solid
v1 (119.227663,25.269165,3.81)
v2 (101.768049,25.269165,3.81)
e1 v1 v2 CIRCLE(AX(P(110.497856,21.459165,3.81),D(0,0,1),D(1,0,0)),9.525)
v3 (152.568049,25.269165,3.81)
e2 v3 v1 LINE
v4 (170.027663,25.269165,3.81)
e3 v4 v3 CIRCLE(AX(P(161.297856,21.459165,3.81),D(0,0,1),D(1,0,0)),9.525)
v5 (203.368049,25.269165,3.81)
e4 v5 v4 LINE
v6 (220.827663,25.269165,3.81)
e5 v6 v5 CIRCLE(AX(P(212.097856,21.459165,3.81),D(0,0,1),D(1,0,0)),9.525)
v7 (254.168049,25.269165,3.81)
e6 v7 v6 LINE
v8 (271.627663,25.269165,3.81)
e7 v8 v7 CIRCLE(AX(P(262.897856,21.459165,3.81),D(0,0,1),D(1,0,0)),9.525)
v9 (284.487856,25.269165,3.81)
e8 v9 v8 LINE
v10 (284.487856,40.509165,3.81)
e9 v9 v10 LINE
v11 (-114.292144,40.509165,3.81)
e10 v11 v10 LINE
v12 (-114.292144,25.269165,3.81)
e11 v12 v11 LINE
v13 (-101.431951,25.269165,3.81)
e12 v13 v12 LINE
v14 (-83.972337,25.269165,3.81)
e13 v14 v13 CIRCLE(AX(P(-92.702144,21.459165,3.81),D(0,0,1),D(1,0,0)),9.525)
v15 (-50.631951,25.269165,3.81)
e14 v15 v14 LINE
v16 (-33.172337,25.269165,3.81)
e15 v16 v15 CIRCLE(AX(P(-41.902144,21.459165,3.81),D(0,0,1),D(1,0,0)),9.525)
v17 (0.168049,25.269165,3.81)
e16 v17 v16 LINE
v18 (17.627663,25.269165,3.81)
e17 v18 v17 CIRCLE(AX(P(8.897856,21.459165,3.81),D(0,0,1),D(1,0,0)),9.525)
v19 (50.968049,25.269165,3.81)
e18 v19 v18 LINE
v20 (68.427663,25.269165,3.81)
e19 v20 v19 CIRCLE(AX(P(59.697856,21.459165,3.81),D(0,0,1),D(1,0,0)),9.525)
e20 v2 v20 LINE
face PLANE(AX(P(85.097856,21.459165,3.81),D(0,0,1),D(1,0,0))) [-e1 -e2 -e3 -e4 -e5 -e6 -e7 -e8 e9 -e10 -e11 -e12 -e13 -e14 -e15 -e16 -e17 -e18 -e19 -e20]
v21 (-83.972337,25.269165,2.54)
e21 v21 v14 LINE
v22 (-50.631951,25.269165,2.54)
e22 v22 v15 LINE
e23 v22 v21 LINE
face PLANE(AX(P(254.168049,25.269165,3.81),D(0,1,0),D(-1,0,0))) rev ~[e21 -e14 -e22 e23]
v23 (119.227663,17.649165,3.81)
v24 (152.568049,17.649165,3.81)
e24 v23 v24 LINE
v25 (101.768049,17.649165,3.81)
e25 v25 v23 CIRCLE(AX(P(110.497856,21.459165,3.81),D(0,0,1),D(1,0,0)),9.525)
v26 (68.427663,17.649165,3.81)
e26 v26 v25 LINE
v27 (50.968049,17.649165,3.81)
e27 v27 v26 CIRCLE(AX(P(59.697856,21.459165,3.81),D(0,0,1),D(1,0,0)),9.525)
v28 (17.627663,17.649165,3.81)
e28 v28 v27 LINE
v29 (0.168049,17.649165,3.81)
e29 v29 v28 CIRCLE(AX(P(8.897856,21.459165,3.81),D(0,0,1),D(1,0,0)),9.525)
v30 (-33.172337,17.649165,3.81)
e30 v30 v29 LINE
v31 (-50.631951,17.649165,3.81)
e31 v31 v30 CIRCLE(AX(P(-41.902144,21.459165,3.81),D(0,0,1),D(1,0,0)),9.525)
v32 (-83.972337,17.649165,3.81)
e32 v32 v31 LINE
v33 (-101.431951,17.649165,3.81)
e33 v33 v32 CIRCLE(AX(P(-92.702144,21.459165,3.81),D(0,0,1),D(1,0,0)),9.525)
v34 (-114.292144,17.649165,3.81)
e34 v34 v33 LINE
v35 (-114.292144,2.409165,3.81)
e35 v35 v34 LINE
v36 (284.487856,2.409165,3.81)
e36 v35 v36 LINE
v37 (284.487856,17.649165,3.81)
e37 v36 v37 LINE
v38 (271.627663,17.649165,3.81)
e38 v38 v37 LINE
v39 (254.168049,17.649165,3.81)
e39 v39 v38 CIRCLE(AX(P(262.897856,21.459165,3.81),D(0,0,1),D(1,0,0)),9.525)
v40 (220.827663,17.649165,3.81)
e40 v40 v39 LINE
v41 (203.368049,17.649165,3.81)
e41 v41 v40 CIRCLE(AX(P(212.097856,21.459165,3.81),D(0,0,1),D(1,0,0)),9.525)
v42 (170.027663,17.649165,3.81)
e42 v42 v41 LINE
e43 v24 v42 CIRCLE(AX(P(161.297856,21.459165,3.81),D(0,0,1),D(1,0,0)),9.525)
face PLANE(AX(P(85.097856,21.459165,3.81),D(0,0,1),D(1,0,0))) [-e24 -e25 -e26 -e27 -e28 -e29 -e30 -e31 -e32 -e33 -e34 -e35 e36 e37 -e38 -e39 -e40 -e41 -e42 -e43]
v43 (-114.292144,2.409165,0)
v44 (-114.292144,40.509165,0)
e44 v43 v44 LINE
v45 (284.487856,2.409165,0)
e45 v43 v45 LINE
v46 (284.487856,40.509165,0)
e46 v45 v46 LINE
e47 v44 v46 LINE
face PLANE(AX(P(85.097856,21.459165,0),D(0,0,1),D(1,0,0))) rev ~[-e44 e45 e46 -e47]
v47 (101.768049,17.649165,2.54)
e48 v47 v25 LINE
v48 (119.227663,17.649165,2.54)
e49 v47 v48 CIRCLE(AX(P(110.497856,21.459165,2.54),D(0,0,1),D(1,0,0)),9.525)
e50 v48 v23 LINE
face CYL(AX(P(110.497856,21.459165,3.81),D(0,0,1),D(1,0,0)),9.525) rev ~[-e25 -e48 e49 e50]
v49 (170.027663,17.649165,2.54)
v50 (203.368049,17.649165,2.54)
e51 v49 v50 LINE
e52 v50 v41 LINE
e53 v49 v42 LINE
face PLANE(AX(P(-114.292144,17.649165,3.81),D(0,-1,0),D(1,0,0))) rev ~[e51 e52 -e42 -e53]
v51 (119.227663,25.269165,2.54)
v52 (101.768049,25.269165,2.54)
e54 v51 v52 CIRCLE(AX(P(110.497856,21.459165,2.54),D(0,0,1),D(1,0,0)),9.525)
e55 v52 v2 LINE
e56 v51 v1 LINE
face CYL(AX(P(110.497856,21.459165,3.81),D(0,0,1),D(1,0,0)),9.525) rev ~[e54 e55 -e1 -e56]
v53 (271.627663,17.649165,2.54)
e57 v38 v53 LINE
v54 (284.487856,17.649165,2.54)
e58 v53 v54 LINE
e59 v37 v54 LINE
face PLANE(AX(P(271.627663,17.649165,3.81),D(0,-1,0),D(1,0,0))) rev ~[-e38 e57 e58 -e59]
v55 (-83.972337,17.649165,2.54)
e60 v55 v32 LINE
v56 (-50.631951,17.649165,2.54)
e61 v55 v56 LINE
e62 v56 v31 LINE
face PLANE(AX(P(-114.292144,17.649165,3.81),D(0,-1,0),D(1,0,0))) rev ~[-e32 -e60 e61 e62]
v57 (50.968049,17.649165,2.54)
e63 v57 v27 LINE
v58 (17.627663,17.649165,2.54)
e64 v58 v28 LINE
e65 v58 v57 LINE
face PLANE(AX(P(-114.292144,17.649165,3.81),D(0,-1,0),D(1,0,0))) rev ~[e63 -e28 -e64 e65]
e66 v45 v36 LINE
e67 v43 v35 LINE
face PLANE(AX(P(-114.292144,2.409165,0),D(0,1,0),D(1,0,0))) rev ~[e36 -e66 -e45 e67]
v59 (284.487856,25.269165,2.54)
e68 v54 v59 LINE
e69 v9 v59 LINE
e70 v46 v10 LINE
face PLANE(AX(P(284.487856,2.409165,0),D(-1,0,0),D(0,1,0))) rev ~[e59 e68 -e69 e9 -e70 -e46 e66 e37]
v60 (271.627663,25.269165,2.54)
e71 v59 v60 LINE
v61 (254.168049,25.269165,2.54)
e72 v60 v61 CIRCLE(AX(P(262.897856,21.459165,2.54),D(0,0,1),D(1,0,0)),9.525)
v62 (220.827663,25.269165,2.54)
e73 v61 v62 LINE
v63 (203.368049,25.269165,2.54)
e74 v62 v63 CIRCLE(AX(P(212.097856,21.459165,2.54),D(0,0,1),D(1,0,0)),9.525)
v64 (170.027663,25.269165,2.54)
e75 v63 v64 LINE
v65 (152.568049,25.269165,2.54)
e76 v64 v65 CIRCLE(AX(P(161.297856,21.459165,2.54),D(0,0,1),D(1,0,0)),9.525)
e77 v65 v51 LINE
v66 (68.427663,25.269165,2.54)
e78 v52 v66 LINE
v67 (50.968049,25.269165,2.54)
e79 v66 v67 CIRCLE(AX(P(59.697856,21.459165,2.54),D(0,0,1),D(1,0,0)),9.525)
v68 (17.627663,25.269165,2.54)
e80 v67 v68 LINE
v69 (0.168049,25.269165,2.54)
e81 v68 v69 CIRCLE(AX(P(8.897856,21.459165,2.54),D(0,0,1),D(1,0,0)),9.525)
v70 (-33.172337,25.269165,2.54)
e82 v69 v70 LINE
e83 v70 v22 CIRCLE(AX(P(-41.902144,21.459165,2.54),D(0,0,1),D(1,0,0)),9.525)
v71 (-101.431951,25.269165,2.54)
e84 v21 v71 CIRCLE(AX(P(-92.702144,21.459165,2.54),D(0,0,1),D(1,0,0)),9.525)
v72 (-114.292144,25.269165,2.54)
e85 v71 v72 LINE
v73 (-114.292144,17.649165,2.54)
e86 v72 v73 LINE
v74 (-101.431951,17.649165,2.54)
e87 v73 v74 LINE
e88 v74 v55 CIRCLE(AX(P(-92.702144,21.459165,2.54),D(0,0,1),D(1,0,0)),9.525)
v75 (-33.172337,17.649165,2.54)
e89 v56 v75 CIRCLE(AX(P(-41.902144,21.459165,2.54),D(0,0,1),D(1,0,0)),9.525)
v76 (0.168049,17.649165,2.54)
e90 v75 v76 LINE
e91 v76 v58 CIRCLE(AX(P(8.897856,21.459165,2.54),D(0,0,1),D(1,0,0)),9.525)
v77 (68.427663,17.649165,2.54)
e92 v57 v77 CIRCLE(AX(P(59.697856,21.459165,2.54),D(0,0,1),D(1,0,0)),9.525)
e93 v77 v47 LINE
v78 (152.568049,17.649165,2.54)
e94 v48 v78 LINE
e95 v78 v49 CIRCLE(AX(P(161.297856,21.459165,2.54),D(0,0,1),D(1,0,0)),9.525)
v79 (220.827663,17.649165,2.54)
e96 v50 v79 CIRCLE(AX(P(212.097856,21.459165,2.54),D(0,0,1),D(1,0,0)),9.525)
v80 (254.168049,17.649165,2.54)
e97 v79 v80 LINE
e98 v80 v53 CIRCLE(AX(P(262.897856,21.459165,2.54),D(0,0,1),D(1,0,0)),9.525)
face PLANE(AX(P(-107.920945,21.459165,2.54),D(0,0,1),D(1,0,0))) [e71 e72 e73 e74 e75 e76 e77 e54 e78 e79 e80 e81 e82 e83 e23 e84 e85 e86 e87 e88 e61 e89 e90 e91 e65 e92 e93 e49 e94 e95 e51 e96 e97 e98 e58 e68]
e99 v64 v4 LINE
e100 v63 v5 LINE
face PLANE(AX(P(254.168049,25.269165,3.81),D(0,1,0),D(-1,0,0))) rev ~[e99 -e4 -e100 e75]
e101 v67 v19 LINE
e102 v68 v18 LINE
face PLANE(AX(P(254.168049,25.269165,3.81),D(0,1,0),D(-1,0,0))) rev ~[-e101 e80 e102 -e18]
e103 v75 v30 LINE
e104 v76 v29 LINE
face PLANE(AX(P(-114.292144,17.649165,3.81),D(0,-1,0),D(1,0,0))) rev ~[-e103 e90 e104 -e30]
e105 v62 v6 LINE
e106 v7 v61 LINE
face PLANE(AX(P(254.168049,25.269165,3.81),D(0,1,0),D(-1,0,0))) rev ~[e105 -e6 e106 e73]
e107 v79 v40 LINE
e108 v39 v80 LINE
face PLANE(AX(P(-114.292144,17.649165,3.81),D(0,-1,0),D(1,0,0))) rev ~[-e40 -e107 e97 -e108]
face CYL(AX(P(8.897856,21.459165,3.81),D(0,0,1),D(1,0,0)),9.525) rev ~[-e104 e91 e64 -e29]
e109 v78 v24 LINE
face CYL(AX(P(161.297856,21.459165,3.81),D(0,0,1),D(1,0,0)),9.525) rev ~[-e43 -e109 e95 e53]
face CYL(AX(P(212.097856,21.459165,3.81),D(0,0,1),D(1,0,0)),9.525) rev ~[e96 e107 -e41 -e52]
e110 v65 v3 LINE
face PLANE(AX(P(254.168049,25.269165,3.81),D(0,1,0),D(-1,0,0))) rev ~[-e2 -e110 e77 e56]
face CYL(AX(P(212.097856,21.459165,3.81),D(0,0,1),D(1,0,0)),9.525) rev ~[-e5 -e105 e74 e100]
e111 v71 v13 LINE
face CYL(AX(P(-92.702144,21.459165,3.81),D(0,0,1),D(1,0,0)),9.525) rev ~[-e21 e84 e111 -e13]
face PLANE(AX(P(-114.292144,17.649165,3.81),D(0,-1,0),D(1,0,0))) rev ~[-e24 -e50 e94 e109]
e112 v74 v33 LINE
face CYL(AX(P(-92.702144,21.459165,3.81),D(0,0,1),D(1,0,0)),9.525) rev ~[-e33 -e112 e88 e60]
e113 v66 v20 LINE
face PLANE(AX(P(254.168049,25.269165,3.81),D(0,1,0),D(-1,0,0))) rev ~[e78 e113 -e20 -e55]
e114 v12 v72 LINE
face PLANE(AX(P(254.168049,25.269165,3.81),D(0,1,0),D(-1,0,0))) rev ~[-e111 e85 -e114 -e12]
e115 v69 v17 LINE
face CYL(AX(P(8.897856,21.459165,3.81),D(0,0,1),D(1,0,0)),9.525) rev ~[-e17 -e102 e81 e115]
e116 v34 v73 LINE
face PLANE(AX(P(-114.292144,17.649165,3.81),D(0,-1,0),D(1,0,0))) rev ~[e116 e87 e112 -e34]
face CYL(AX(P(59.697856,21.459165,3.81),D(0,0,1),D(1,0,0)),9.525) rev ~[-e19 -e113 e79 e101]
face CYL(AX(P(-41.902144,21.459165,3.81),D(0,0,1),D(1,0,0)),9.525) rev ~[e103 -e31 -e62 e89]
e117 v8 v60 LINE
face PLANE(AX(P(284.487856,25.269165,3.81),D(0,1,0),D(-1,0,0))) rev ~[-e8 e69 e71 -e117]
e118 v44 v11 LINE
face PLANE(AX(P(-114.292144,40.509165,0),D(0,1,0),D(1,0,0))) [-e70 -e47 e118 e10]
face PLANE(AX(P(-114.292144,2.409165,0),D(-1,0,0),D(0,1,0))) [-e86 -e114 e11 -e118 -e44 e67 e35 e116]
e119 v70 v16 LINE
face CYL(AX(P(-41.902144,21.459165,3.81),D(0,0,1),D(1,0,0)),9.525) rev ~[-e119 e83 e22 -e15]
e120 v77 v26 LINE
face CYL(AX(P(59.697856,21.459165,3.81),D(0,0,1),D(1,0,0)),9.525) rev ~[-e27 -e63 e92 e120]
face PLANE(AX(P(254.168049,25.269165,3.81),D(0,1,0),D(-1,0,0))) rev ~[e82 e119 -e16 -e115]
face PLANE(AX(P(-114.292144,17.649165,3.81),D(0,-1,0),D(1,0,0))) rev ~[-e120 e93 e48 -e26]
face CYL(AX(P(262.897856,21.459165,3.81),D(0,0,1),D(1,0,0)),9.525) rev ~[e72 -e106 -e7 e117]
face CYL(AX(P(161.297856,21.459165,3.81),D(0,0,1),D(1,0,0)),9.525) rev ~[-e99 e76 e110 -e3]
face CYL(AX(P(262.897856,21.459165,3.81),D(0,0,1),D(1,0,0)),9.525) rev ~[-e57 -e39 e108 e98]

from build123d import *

# Parameters (mm, degrees)
F0_W     = 398.78
F0_H     = 38.1
F1_DEPTH = 3.81
F2_R     = 9.525
F3_DEPTH = 1.27
F5_DEPTH = 1.27


with BuildPart() as f1:
    # F0 (on Top) → F1 (new body)
    with BuildSketch(Plane.XY):
        with Locations((85.0978558012, 21.4591654949)):
            Rectangle(F0_W, F0_H)
    extrude(amount=F1_DEPTH)

    # F2 (on face) → F3 (cut)
    with BuildSketch(Plane.XY.offset(3.81)):
        with Locations((-92.7021441988, 21.4591654949)):
            Circle(F2_R)
        with Locations((-41.9021441988, 21.4591654949)):
            Circle(F2_R)
        with Locations((8.8978558012, 21.4591654949)):
            Circle(F2_R)
        with Locations((59.6978558012, 21.4591654949)):
            Circle(F2_R)
        with Locations((110.4978558012, 21.4591654949)):
            Circle(F2_R)
        with Locations((161.2978558012, 21.4591654949)):
            Circle(F2_R)
        with Locations((212.0978558012, 21.4591654949)):
            Circle(F2_R)
        with Locations((262.8978558012, 21.4591654949)):
            Circle(F2_R)
    extrude(amount=-F3_DEPTH, mode=Mode.SUBTRACT)

    # F4 (on face) → F5 (cut)
    with BuildSketch(Plane.XY.offset(3.81)):
        with BuildLine():
            Line((-101.4319508977, 25.2691654949), (-114.2921441988, 25.2691654949))
            Line((-114.2921441988, 25.2691654949), (-114.2921441988, 17.6491654949))
            Line((-114.2921441988, 17.6491654949), (-101.4319508977, 17.6491654949))
            ThreePointArc((-101.4319508977, 17.6491654949), (-102.2271441988, 21.4591654949), (-101.4319508977, 25.2691654949))
        make_face()
        with BuildLine():
            Line((-83.9723374999, 25.2691654949), (-101.4319508977, 25.2691654949))
            ThreePointArc((-101.4319508977, 25.2691654949), (-102.2271441988, 21.4591654949), (-101.4319508977, 17.6491654949))
            Line((-101.4319508977, 17.6491654949), (-83.9723374999, 17.6491654949))
            ThreePointArc((-83.9723374999, 17.6491654949), (-83.3780615681, 19.5131161387), (-83.1771441988, 21.4591654949))
            ThreePointArc((-83.1771441988, 21.4591654949), (-83.3780615681, 23.405214851), (-83.9723374999, 25.2691654949))
        make_face()
        with BuildLine():
            Line((-50.6319508977, 25.2691654949), (-83.9723374999, 25.2691654949))
            ThreePointArc((-83.9723374999, 25.2691654949), (-83.3780615681, 23.405214851), (-83.1771441988, 21.4591654949))
            ThreePointArc((-83.1771441988, 21.4591654949), (-83.3780615681, 19.5131161387), (-83.9723374999, 17.6491654949))
            Line((-83.9723374999, 17.6491654949), (-50.6319508977, 17.6491654949))
            ThreePointArc((-50.6319508977, 17.6491654949), (-51.4271441988, 21.4591654949), (-50.6319508977, 25.2691654949))
        make_face()
        with BuildLine():
            Line((-33.1723374999, 25.2691654949), (-50.6319508977, 25.2691654949))
            ThreePointArc((-50.6319508977, 25.2691654949), (-51.4271441988, 21.4591654949), (-50.6319508977, 17.6491654949))
            Line((-50.6319508977, 17.6491654949), (-33.1723374999, 17.6491654949))
            ThreePointArc((-33.1723374999, 17.6491654949), (-32.5780615681, 19.5131161387), (-32.3771441988, 21.4591654949))
            ThreePointArc((-32.3771441988, 21.4591654949), (-32.5780615681, 23.405214851), (-33.1723374999, 25.2691654949))
        make_face()
        with BuildLine():
            Line((284.4878558012, 17.6491654949), (284.4878558012, 25.2691654949))
            Line((284.4878558012, 25.2691654949), (271.6276625001, 25.2691654949))
            ThreePointArc((271.6276625001, 25.2691654949), (272.2219384319, 23.405214851), (272.4228558012, 21.4591654949))
            ThreePointArc((272.4228558012, 21.4591654949), (272.2219384319, 19.5131161387), (271.6276625001, 17.6491654949))
            Line((271.6276625001, 17.6491654949), (284.4878558012, 17.6491654949))
        make_face()
        with BuildLine():
            Line((0.1680491023, 25.2691654949), (-33.1723374999, 25.2691654949))
            ThreePointArc((-33.1723374999, 25.2691654949), (-32.5780615681, 23.405214851), (-32.3771441988, 21.4591654949))
            ThreePointArc((-32.3771441988, 21.4591654949), (-32.5780615681, 19.5131161387), (-33.1723374999, 17.6491654949))
            Line((-33.1723374999, 17.6491654949), (0.1680491023, 17.6491654949))
            ThreePointArc((0.1680491023, 17.6491654949), (-0.6271441988, 21.4591654949), (0.1680491023, 25.2691654949))
        make_face()
        with BuildLine():
            Line((17.6276625001, 25.2691654949), (0.1680491023, 25.2691654949))
            ThreePointArc((0.1680491023, 25.2691654949), (-0.6271441988, 21.4591654949), (0.1680491023, 17.6491654949))
            Line((0.1680491023, 17.6491654949), (17.6276625001, 17.6491654949))
            ThreePointArc((17.6276625001, 17.6491654949), (18.2219384319, 19.5131161387), (18.4228558012, 21.4591654949))
            ThreePointArc((18.4228558012, 21.4591654949), (18.2219384319, 23.405214851), (17.6276625001, 25.2691654949))
        make_face()
        with BuildLine():
            ThreePointArc((254.1680491023, 17.6491654949), (253.3728558012, 21.4591654949), (254.1680491023, 25.2691654949))
            Line((254.1680491023, 25.2691654949), (220.8276625001, 25.2691654949))
            ThreePointArc((220.8276625001, 25.2691654949), (221.4219384319, 23.405214851), (221.6228558012, 21.4591654949))
            ThreePointArc((221.6228558012, 21.4591654949), (221.4219384319, 19.5131161387), (220.8276625001, 17.6491654949))
            Line((220.8276625001, 17.6491654949), (254.1680491023, 17.6491654949))
        make_face()
        with BuildLine():
            Line((50.9680491023, 25.2691654949), (17.6276625001, 25.2691654949))
            ThreePointArc((17.6276625001, 25.2691654949), (18.2219384319, 23.405214851), (18.4228558012, 21.4591654949))
            ThreePointArc((18.4228558012, 21.4591654949), (18.2219384319, 19.5131161387), (17.6276625001, 17.6491654949))
            Line((17.6276625001, 17.6491654949), (50.9680491023, 17.6491654949))
            ThreePointArc((50.9680491023, 17.6491654949), (50.1728558012, 21.4591654949), (50.9680491023, 25.2691654949))
        make_face()
        with BuildLine():
            ThreePointArc((221.6228558012, 21.4591654949), (221.4219384319, 23.405214851), (220.8276625001, 25.2691654949))
            Line((220.8276625001, 25.2691654949), (203.3680491023, 25.2691654949))
            ThreePointArc((203.3680491023, 25.2691654949), (202.5728558012, 21.4591654949), (203.3680491023, 17.6491654949))
            Line((203.3680491023, 17.6491654949), (220.8276625001, 17.6491654949))
            ThreePointArc((220.8276625001, 17.6491654949), (221.4219384319, 19.5131161387), (221.6228558012, 21.4591654949))
        make_face()
        with BuildLine():
            Line((68.4276625001, 25.2691654949), (50.9680491023, 25.2691654949))
            ThreePointArc((50.9680491023, 25.2691654949), (50.1728558012, 21.4591654949), (50.9680491023, 17.6491654949))
            Line((50.9680491023, 17.6491654949), (68.4276625001, 17.6491654949))
            ThreePointArc((68.4276625001, 17.6491654949), (69.0219384319, 19.5131161387), (69.2228558012, 21.4591654949))
            ThreePointArc((69.2228558012, 21.4591654949), (69.0219384319, 23.405214851), (68.4276625001, 25.2691654949))
        make_face()
        with BuildLine():
            ThreePointArc((203.3680491023, 17.6491654949), (202.5728558012, 21.4591654949), (203.3680491023, 25.2691654949))
            Line((203.3680491023, 25.2691654949), (170.0276625001, 25.2691654949))
            ThreePointArc((170.0276625001, 25.2691654949), (170.6219384319, 23.405214851), (170.8228558012, 21.4591654949))
            ThreePointArc((170.8228558012, 21.4591654949), (170.6219384319, 19.5131161387), (170.0276625001, 17.6491654949))
            Line((170.0276625001, 17.6491654949), (203.3680491023, 17.6491654949))
        make_face()
        with BuildLine():
            Line((101.7680491023, 25.2691654949), (68.4276625001, 25.2691654949))
            ThreePointArc((68.4276625001, 25.2691654949), (69.0219384319, 23.405214851), (69.2228558012, 21.4591654949))
            ThreePointArc((69.2228558012, 21.4591654949), (69.0219384319, 19.5131161387), (68.4276625001, 17.6491654949))
            Line((68.4276625001, 17.6491654949), (101.7680491023, 17.6491654949))
            ThreePointArc((101.7680491023, 17.6491654949), (100.9728558012, 21.4591654949), (101.7680491023, 25.2691654949))
        make_face()
        with BuildLine():
            ThreePointArc((170.8228558012, 21.4591654949), (170.6219384319, 23.405214851), (170.0276625001, 25.2691654949))
            Line((170.0276625001, 25.2691654949), (152.5680491023, 25.2691654949))
            ThreePointArc((152.5680491023, 25.2691654949), (151.7728558012, 21.4591654949), (152.5680491023, 17.6491654949))
            Line((152.5680491023, 17.6491654949), (170.0276625001, 17.6491654949))
            ThreePointArc((170.0276625001, 17.6491654949), (170.6219384319, 19.5131161387), (170.8228558012, 21.4591654949))
        make_face()
        with BuildLine():
            Line((119.2276625001, 25.2691654949), (101.7680491023, 25.2691654949))
            ThreePointArc((101.7680491023, 25.2691654949), (100.9728558012, 21.4591654949), (101.7680491023, 17.6491654949))
            Line((101.7680491023, 17.6491654949), (119.2276625001, 17.6491654949))
            ThreePointArc((119.2276625001, 17.6491654949), (119.8219384319, 19.5131161387), (120.0228558012, 21.4591654949))
            ThreePointArc((120.0228558012, 21.4591654949), (119.8219384319, 23.405214851), (119.2276625001, 25.2691654949))
        make_face()
        with BuildLine():
            ThreePointArc((152.5680491023, 17.6491654949), (151.7728558012, 21.4591654949), (152.5680491023, 25.2691654949))
            Line((152.5680491023, 25.2691654949), (119.2276625001, 25.2691654949))
            ThreePointArc((119.2276625001, 25.2691654949), (119.8219384319, 23.405214851), (120.0228558012, 21.4591654949))
            ThreePointArc((120.0228558012, 21.4591654949), (119.8219384319, 19.5131161387), (119.2276625001, 17.6491654949))
            Line((119.2276625001, 17.6491654949), (152.5680491023, 17.6491654949))
        make_face()
    extrude(amount=-F5_DEPTH, mode=Mode.SUBTRACT)


solid = f1.part
